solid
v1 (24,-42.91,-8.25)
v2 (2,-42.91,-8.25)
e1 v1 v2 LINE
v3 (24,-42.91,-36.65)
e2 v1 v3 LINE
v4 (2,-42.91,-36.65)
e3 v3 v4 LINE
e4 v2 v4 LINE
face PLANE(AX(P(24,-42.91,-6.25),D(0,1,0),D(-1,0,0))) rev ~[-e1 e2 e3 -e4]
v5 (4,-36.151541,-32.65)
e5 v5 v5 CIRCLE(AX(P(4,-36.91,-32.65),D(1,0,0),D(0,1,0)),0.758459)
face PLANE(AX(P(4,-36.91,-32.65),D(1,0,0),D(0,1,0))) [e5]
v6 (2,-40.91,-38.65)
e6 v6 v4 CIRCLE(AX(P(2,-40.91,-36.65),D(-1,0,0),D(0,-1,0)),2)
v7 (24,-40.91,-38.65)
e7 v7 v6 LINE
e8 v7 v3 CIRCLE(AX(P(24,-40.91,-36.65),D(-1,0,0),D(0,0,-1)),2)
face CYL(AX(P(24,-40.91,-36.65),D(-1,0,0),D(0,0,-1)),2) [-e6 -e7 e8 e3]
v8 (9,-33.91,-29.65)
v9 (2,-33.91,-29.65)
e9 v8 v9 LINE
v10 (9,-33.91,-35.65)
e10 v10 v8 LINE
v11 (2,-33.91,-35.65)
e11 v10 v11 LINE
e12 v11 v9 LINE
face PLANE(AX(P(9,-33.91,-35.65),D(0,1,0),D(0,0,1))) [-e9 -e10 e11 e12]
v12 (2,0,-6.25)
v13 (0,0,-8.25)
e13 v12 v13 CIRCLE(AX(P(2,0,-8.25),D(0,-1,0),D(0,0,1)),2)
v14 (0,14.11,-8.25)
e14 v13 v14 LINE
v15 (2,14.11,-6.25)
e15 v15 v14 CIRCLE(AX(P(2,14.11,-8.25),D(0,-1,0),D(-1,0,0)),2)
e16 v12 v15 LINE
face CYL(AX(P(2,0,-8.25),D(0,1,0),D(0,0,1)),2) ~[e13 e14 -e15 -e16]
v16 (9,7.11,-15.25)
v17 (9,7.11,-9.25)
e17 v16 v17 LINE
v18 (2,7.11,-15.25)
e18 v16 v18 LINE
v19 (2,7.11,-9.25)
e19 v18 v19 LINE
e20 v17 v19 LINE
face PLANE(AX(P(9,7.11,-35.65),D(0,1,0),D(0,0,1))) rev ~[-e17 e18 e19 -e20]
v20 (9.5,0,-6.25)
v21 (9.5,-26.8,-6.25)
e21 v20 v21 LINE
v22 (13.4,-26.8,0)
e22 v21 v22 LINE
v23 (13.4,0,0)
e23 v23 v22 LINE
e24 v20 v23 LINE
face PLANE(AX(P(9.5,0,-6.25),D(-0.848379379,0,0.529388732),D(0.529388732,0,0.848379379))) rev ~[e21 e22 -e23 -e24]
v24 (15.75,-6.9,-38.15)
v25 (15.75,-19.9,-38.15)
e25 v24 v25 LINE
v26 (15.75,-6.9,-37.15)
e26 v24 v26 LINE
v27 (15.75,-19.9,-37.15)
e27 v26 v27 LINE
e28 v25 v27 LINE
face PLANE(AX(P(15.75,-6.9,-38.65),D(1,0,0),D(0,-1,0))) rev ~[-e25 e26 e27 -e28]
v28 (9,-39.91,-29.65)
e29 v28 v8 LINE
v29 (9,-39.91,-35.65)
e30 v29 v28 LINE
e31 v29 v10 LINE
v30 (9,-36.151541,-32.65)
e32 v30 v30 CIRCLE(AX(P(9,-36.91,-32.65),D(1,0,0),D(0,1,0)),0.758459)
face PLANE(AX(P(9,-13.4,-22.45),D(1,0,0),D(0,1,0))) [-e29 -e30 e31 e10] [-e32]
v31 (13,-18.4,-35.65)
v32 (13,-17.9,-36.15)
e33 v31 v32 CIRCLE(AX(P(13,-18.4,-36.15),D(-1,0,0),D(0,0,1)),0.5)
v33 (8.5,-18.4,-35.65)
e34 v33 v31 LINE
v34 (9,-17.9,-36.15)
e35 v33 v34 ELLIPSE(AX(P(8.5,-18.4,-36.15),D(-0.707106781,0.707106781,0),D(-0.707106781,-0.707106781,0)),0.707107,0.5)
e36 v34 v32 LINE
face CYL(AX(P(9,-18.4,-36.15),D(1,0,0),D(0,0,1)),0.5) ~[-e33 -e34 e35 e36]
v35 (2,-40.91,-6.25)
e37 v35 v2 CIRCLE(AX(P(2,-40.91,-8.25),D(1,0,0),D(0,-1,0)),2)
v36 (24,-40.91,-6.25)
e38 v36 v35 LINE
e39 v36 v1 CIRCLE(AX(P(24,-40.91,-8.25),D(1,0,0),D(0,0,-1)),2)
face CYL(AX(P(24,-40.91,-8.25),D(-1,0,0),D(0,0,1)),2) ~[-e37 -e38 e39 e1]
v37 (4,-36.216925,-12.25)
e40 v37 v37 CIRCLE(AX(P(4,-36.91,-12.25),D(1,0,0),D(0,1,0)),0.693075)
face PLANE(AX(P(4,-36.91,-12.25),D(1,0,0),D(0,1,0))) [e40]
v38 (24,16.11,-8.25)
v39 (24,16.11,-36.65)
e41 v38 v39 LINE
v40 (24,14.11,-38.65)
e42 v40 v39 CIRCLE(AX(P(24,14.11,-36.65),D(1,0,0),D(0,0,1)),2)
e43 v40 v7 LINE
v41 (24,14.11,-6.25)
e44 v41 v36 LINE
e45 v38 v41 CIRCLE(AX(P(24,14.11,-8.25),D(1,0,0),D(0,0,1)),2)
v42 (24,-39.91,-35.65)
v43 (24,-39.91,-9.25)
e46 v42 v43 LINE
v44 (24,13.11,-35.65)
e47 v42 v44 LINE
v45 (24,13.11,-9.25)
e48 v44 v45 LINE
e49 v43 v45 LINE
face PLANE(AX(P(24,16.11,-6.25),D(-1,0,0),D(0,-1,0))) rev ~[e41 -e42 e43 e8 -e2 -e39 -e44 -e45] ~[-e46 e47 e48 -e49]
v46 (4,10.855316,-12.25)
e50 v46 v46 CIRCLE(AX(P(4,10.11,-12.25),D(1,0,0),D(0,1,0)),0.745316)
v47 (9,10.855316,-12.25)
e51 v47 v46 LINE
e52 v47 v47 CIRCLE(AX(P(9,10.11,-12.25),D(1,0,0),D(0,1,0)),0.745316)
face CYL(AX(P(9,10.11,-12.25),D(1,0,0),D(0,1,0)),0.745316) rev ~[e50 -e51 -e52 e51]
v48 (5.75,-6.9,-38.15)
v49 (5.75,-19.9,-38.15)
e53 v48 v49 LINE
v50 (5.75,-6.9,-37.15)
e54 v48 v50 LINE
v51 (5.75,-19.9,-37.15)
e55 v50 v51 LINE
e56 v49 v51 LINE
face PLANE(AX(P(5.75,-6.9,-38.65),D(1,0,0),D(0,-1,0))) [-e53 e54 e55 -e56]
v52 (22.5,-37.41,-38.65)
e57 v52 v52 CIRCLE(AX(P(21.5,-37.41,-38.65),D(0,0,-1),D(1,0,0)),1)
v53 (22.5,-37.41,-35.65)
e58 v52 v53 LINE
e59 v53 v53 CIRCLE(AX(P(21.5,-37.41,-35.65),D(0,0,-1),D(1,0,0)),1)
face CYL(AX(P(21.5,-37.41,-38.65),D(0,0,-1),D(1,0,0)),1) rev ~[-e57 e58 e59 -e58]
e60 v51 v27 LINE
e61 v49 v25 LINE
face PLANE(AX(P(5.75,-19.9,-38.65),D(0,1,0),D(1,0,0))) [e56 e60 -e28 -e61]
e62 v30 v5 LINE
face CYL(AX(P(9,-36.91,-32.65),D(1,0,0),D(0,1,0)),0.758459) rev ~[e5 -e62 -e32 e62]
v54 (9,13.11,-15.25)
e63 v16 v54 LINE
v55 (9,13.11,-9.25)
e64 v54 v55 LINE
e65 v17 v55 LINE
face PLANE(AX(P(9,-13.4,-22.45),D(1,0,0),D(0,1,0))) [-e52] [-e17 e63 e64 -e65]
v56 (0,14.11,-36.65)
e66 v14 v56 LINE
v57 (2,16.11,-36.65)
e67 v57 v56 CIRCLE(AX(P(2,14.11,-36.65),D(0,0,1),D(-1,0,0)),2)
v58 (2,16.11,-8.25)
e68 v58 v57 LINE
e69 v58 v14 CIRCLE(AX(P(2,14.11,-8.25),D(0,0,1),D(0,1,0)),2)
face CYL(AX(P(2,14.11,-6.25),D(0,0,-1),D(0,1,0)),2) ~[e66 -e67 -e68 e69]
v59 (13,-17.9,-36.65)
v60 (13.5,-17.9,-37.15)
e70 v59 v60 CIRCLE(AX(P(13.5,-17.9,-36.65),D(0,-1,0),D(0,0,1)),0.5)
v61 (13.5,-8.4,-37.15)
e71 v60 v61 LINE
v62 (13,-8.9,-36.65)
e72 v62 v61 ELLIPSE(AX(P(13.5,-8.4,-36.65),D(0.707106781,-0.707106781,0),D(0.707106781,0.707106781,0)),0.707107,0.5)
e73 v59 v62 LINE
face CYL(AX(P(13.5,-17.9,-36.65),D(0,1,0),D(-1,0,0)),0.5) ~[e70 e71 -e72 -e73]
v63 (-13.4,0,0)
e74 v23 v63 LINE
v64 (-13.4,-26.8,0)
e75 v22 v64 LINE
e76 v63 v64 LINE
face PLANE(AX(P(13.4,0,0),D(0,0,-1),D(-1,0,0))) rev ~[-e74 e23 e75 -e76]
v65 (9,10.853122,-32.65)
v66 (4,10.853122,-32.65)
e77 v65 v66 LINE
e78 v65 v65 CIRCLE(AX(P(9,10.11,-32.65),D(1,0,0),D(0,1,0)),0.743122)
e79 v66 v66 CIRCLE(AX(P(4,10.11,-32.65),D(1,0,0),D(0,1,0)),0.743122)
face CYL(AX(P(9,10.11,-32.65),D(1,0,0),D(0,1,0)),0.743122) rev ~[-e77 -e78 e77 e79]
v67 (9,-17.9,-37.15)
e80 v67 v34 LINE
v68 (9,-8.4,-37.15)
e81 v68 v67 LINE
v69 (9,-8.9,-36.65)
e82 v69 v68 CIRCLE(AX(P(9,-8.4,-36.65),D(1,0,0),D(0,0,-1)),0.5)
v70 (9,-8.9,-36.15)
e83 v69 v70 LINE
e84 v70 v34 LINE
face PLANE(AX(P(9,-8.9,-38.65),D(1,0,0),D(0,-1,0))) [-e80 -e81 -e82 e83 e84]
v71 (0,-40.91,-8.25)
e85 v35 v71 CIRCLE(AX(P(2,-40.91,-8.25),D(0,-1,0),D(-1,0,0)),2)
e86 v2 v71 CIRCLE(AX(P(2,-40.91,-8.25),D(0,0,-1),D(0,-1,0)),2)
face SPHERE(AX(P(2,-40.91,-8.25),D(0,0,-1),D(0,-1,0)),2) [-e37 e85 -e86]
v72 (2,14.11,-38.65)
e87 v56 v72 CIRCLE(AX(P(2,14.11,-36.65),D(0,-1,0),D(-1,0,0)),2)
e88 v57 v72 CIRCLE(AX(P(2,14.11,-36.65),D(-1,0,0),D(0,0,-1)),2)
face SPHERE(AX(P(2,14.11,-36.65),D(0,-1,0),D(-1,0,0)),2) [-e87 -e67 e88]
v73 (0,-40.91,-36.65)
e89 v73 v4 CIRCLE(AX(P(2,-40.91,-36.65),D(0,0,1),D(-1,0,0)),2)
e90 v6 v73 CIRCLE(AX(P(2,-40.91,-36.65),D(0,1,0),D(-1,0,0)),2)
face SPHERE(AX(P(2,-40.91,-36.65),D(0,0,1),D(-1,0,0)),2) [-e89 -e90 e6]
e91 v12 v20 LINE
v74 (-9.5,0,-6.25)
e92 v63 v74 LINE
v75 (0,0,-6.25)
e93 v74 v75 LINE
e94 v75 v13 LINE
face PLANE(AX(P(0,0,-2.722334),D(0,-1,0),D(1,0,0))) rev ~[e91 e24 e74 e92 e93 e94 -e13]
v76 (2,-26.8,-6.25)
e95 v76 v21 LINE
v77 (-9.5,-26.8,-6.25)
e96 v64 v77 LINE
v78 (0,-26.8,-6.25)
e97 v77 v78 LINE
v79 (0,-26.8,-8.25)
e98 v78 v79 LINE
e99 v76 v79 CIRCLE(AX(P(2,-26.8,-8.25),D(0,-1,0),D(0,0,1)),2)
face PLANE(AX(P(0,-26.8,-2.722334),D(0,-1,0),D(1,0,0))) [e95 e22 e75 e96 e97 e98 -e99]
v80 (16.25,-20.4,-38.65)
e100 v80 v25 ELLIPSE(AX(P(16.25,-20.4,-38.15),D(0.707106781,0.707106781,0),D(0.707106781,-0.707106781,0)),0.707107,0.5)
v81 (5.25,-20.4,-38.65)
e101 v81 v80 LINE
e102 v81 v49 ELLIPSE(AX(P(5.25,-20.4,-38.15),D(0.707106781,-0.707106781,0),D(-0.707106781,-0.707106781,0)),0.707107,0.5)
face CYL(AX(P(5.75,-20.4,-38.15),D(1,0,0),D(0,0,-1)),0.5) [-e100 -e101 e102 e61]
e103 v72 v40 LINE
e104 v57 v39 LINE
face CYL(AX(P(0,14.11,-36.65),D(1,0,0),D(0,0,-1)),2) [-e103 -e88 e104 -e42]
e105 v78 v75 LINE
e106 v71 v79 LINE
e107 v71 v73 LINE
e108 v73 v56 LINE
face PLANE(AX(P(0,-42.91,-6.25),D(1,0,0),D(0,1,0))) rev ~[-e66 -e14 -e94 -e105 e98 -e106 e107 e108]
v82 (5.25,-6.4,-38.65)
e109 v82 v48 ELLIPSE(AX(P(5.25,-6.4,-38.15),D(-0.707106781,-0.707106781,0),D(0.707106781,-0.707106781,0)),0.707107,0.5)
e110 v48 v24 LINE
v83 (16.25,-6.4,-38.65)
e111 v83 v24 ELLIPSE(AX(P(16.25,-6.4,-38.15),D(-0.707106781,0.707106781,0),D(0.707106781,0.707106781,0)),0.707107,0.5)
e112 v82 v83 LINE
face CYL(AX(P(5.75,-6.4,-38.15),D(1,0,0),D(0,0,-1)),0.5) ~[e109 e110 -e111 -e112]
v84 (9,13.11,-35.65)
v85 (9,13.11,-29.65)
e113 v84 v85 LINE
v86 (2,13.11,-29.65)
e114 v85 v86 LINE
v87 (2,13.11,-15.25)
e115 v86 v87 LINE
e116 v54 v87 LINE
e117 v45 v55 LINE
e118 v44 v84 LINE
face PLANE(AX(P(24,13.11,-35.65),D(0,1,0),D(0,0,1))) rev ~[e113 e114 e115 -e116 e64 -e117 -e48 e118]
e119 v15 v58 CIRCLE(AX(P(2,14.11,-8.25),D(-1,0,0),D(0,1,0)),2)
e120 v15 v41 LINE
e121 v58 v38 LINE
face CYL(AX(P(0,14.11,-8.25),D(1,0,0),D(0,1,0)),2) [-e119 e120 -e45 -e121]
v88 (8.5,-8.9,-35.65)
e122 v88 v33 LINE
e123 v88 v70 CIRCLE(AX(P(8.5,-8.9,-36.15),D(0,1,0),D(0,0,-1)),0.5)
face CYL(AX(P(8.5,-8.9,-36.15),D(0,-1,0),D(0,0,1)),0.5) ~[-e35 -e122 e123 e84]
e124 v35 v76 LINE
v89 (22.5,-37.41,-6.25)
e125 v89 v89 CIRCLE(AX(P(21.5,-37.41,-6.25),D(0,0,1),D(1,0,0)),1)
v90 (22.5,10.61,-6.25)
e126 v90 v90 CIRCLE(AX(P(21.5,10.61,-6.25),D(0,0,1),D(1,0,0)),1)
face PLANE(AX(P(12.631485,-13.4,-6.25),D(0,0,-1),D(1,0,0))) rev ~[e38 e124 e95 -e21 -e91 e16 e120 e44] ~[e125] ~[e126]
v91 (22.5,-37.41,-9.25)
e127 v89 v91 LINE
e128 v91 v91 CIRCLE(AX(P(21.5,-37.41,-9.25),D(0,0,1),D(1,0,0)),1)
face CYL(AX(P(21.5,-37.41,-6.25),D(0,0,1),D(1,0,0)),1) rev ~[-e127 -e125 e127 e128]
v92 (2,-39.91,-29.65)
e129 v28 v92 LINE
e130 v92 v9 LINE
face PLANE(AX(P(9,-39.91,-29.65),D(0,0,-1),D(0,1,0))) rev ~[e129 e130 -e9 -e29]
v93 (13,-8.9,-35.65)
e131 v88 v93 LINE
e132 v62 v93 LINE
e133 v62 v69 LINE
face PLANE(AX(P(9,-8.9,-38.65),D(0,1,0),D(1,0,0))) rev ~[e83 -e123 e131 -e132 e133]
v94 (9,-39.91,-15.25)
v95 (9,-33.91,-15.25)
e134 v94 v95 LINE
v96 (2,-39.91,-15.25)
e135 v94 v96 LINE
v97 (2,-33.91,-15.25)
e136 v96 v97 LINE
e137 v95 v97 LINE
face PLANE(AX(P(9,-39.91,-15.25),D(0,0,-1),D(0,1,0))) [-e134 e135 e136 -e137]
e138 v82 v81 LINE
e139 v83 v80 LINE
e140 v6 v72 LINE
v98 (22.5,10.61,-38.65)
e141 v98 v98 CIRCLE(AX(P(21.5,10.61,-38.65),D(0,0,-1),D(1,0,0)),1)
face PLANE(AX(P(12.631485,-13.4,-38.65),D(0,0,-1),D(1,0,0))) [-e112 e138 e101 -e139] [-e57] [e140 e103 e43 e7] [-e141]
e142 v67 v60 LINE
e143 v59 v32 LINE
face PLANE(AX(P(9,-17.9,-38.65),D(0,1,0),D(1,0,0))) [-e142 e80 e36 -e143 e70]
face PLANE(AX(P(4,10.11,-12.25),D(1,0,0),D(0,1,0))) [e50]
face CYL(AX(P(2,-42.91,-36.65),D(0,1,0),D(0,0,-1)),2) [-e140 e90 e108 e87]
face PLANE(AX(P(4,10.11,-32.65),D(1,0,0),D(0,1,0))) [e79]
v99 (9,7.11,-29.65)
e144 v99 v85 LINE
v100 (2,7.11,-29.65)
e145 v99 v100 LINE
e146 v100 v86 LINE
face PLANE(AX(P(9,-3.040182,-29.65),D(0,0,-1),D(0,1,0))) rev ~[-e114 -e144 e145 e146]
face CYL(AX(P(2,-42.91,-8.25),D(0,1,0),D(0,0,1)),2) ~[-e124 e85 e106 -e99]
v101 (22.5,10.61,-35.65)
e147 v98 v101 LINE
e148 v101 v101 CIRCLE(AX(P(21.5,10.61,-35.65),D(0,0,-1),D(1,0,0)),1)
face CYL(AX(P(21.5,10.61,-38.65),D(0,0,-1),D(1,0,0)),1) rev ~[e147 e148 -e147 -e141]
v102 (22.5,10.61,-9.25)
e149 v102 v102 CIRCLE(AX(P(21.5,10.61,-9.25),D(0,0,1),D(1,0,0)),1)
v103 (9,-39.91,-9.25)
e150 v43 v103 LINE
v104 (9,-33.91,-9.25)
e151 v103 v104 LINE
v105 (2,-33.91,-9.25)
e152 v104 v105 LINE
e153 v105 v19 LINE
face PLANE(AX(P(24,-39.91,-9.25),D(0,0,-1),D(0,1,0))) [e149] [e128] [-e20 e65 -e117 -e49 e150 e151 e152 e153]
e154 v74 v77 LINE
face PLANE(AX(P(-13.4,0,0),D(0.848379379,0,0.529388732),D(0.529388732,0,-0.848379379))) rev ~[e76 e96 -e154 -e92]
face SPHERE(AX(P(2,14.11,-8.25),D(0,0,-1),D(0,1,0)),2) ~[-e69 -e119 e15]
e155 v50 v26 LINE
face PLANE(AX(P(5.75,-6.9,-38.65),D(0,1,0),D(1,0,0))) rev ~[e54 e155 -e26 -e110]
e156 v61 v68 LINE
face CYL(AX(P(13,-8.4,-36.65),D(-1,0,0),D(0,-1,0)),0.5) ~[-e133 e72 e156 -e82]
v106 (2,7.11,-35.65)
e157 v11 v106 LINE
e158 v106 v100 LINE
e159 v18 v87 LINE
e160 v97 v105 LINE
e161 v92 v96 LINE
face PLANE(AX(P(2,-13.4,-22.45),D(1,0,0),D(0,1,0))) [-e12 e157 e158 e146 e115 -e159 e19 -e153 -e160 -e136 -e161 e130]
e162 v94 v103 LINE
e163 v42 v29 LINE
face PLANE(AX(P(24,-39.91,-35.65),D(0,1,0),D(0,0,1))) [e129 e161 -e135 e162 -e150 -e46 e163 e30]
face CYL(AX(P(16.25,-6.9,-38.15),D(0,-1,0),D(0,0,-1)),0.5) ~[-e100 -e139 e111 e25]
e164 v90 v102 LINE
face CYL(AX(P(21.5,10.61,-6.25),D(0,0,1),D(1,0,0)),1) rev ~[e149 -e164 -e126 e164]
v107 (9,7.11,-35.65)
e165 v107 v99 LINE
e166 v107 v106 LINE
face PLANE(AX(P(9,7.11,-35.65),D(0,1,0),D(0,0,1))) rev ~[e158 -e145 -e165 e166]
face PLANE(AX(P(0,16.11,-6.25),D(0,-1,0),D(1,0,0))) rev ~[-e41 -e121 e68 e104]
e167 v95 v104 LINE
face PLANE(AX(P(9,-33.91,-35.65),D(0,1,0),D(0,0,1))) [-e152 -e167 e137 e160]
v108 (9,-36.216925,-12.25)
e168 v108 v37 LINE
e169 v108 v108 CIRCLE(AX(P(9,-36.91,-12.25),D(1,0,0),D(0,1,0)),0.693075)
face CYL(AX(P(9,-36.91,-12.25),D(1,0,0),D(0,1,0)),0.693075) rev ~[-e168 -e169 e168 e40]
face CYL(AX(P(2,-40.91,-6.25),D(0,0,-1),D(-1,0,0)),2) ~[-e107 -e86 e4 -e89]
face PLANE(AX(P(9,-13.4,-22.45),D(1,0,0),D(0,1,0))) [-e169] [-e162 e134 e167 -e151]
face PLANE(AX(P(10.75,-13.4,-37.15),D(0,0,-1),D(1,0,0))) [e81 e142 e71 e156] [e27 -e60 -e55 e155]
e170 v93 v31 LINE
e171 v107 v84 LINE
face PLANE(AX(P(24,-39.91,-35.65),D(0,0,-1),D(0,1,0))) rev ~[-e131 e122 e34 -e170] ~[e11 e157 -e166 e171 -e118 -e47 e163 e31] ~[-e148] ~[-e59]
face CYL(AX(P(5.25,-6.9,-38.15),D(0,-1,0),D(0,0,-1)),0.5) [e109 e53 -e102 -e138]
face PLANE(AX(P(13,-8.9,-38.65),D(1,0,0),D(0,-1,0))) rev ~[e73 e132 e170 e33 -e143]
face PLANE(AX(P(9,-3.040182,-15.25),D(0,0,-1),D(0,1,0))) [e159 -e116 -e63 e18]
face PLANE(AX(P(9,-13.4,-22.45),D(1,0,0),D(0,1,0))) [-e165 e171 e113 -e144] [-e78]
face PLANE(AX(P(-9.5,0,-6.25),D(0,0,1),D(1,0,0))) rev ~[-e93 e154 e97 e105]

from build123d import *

# Parameters (mm, degrees)
F1_DEPTH  = 26.8
F2_W      = 9.5
F2_H      = 26.8
F3_DEPTH  = 32.4
F4_W      = 53.02
F4_H      = 26.4
F5_DEPTH  = 15
F6_W      = 41.02
F6_H      = 26.4
F7_DEPTH  = 7
F8_W      = 33.1776287834
F8_H      = 14.4
F9_DEPTH  = 7
F10_W     = 16.1501816639
F10_H     = 14.4
F11_DEPTH = 7
F12_R     = 0.6930745825
F13_DEPTH = 5
F14_R     = 0.7453155857
F15_DEPTH = 5
F16_R     = 0.7584591481
F17_DEPTH = 5
F18_R     = 0.7431215043
F19_DEPTH = 5
F20_W     = 4
F20_H     = 9
F21_DEPTH = 5
F22_W     = 10
F22_H     = 13
F23_DEPTH = 1.5
F24_R     = 0.5
F25_R     = 2
F26_R     = 1
F27_DEPTH = 5
F28_R     = 1
F29_DEPTH = 5
F30_R     = 1
F31_DEPTH = 5
F32_R     = 1
F33_DEPTH = 5


with BuildPart() as f1:
    # F0 (on Front) → F1 (new body)
    with BuildSketch(Plane.XZ):
        Polygon((13.4, 0), (-13.4, 0), (-9.5, -6.25), (9.5, -6.25), align=None)
    extrude(amount=F1_DEPTH)

    # F2 (on face) → F3 (join)
    with BuildSketch(Plane(origin=(0, 0, -6.25), x_dir=(1, 0, 0), z_dir=(0, 0, -1))):
        Polygon((24, 42.91), (0, 42.91), (0, 26.8), (9.5, 26.8), (9.5, 0), (0, 0), (0, -16.11), (24, -16.11), align=None)
        with Locations((4.75, 13.4)):
            Rectangle(F2_W, F2_H)
    extrude(amount=F3_DEPTH)

    # F4 (on face) → F5 (cut)
    with BuildSketch(Plane.YZ.offset(24)):
        with Locations((-13.4, -22.45)):
            Rectangle(F4_W, F4_H)
    extrude(amount=-F5_DEPTH, mode=Mode.SUBTRACT)

    # F6 (on face) → F7 (cut)
    with BuildSketch(Plane.YZ.offset(9)):
        with Locations((-13.4, -22.45)):
            Rectangle(F6_W, F6_H)
    extrude(amount=-F7_DEPTH, mode=Mode.SUBTRACT)

    # F8 (on face) → F9 (cut)
    with BuildSketch(Plane.YZ.offset(9)):
        with Locations((-23.3211856083, -22.45)):
            Rectangle(F8_W, F8_H)
    extrude(amount=-F9_DEPTH, mode=Mode.SUBTRACT)

    # F10 (on face) → F11 (cut)
    with BuildSketch(Plane.YZ.offset(9)):
        with Locations((5.0349091681, -22.45)):
            Rectangle(F10_W, F10_H)
    extrude(amount=-F11_DEPTH, mode=Mode.SUBTRACT)

    # F12 (on face) → F13 (cut)
    with BuildSketch(Plane.YZ.offset(9)):
        with Locations((-36.91, -12.25)):
            Circle(F12_R)
    extrude(amount=-F13_DEPTH, mode=Mode.SUBTRACT)

    # F14 (on face) → F15 (cut)
    with BuildSketch(Plane.YZ.offset(9)):
        with Locations((10.11, -12.25)):
            Circle(F14_R)
    extrude(amount=-F15_DEPTH, mode=Mode.SUBTRACT)

    # F16 (on face) → F17 (cut)
    with BuildSketch(Plane.YZ.offset(9)):
        with Locations((-36.91, -32.65)):
            Circle(F16_R)
    extrude(amount=-F17_DEPTH, mode=Mode.SUBTRACT)

    # F18 (on face) → F19 (cut)
    with BuildSketch(Plane.YZ.offset(9)):
        with Locations((10.11, -32.65)):
            Circle(F18_R)
    extrude(amount=-F19_DEPTH, mode=Mode.SUBTRACT)

    # F20 (on face) → F21 (cut)
    with BuildSketch(Plane(origin=(0, 0, -38.65), x_dir=(1, 0, 0), z_dir=(0, 0, -1))):
        with Locations((11, 13.4)):
            Rectangle(F20_W, F20_H)
    extrude(amount=-F21_DEPTH, mode=Mode.SUBTRACT)

    # F22 (on face) → F23 (cut)
    with BuildSketch(Plane(origin=(0, 0, -38.65), x_dir=(1, 0, 0), z_dir=(0, 0, -1))):
        with Locations((10.75, 13.4)):
            Rectangle(F22_W, F22_H)
    extrude(amount=-F23_DEPTH, mode=Mode.SUBTRACT)

    # F24
    f24_edges = [f1.edges().sort_by_distance(p)[0] for p in [
        (5.75, -13.4, -38.65),
        (9, -13.4, -35.65),
        (13, -13.4, -37.15),
        (10.75, -6.9, -38.65),
        (11, -8.9, -37.15),
        (11, -17.9, -35.65),
        (15.75, -13.4, -38.65),
        (10.75, -19.9, -38.65),
    ]]
    fillet(f24_edges, radius=F24_R)

    # F25
    f25_edges = [f1.edges().sort_by_distance(p)[0] for p in [
        (0, -42.91, -22.45),
        (0, -13.4, -38.65),
        (0, 16.11, -22.45),
        (12, -42.91, -38.65),
        (12, -42.91, -6.25),
        (12, 16.11, -38.65),
        (12, 16.11, -6.25),
        (0, 8.055, -6.25),
        (0, -34.855, -6.25),
    ]]
    fillet(f25_edges, radius=F25_R)

    # F26 (on face) → F27 (cut)
    with BuildSketch(Plane(origin=(0, 0, -38.65), x_dir=(1, 0, 0), z_dir=(0, 0, -1))):
        with Locations((21.5, 37.41)):
            Circle(F26_R)
    extrude(amount=-F27_DEPTH, mode=Mode.SUBTRACT)

    # F28 (on face) → F29 (cut)
    with BuildSketch(Plane(origin=(0, 0, -38.65), x_dir=(1, 0, 0), z_dir=(0, 0, -1))):
        with Locations((21.5, -10.61)):
            Circle(F28_R)
    extrude(amount=-F29_DEPTH, mode=Mode.SUBTRACT)

    # F30 (on face) → F31 (cut)
    with BuildSketch(Plane.XY.offset(-6.25)):
        with Locations((21.5, 10.61)):
            Circle(F30_R)
    extrude(amount=-F31_DEPTH, mode=Mode.SUBTRACT)

    # F32 (on face) → F33 (cut)
    with BuildSketch(Plane.XY.offset(-6.25)):
        with Locations((21.5, -37.41)):
            Circle(F32_R)
    extrude(amount=-F33_DEPTH, mode=Mode.SUBTRACT)


solid = f1.part
